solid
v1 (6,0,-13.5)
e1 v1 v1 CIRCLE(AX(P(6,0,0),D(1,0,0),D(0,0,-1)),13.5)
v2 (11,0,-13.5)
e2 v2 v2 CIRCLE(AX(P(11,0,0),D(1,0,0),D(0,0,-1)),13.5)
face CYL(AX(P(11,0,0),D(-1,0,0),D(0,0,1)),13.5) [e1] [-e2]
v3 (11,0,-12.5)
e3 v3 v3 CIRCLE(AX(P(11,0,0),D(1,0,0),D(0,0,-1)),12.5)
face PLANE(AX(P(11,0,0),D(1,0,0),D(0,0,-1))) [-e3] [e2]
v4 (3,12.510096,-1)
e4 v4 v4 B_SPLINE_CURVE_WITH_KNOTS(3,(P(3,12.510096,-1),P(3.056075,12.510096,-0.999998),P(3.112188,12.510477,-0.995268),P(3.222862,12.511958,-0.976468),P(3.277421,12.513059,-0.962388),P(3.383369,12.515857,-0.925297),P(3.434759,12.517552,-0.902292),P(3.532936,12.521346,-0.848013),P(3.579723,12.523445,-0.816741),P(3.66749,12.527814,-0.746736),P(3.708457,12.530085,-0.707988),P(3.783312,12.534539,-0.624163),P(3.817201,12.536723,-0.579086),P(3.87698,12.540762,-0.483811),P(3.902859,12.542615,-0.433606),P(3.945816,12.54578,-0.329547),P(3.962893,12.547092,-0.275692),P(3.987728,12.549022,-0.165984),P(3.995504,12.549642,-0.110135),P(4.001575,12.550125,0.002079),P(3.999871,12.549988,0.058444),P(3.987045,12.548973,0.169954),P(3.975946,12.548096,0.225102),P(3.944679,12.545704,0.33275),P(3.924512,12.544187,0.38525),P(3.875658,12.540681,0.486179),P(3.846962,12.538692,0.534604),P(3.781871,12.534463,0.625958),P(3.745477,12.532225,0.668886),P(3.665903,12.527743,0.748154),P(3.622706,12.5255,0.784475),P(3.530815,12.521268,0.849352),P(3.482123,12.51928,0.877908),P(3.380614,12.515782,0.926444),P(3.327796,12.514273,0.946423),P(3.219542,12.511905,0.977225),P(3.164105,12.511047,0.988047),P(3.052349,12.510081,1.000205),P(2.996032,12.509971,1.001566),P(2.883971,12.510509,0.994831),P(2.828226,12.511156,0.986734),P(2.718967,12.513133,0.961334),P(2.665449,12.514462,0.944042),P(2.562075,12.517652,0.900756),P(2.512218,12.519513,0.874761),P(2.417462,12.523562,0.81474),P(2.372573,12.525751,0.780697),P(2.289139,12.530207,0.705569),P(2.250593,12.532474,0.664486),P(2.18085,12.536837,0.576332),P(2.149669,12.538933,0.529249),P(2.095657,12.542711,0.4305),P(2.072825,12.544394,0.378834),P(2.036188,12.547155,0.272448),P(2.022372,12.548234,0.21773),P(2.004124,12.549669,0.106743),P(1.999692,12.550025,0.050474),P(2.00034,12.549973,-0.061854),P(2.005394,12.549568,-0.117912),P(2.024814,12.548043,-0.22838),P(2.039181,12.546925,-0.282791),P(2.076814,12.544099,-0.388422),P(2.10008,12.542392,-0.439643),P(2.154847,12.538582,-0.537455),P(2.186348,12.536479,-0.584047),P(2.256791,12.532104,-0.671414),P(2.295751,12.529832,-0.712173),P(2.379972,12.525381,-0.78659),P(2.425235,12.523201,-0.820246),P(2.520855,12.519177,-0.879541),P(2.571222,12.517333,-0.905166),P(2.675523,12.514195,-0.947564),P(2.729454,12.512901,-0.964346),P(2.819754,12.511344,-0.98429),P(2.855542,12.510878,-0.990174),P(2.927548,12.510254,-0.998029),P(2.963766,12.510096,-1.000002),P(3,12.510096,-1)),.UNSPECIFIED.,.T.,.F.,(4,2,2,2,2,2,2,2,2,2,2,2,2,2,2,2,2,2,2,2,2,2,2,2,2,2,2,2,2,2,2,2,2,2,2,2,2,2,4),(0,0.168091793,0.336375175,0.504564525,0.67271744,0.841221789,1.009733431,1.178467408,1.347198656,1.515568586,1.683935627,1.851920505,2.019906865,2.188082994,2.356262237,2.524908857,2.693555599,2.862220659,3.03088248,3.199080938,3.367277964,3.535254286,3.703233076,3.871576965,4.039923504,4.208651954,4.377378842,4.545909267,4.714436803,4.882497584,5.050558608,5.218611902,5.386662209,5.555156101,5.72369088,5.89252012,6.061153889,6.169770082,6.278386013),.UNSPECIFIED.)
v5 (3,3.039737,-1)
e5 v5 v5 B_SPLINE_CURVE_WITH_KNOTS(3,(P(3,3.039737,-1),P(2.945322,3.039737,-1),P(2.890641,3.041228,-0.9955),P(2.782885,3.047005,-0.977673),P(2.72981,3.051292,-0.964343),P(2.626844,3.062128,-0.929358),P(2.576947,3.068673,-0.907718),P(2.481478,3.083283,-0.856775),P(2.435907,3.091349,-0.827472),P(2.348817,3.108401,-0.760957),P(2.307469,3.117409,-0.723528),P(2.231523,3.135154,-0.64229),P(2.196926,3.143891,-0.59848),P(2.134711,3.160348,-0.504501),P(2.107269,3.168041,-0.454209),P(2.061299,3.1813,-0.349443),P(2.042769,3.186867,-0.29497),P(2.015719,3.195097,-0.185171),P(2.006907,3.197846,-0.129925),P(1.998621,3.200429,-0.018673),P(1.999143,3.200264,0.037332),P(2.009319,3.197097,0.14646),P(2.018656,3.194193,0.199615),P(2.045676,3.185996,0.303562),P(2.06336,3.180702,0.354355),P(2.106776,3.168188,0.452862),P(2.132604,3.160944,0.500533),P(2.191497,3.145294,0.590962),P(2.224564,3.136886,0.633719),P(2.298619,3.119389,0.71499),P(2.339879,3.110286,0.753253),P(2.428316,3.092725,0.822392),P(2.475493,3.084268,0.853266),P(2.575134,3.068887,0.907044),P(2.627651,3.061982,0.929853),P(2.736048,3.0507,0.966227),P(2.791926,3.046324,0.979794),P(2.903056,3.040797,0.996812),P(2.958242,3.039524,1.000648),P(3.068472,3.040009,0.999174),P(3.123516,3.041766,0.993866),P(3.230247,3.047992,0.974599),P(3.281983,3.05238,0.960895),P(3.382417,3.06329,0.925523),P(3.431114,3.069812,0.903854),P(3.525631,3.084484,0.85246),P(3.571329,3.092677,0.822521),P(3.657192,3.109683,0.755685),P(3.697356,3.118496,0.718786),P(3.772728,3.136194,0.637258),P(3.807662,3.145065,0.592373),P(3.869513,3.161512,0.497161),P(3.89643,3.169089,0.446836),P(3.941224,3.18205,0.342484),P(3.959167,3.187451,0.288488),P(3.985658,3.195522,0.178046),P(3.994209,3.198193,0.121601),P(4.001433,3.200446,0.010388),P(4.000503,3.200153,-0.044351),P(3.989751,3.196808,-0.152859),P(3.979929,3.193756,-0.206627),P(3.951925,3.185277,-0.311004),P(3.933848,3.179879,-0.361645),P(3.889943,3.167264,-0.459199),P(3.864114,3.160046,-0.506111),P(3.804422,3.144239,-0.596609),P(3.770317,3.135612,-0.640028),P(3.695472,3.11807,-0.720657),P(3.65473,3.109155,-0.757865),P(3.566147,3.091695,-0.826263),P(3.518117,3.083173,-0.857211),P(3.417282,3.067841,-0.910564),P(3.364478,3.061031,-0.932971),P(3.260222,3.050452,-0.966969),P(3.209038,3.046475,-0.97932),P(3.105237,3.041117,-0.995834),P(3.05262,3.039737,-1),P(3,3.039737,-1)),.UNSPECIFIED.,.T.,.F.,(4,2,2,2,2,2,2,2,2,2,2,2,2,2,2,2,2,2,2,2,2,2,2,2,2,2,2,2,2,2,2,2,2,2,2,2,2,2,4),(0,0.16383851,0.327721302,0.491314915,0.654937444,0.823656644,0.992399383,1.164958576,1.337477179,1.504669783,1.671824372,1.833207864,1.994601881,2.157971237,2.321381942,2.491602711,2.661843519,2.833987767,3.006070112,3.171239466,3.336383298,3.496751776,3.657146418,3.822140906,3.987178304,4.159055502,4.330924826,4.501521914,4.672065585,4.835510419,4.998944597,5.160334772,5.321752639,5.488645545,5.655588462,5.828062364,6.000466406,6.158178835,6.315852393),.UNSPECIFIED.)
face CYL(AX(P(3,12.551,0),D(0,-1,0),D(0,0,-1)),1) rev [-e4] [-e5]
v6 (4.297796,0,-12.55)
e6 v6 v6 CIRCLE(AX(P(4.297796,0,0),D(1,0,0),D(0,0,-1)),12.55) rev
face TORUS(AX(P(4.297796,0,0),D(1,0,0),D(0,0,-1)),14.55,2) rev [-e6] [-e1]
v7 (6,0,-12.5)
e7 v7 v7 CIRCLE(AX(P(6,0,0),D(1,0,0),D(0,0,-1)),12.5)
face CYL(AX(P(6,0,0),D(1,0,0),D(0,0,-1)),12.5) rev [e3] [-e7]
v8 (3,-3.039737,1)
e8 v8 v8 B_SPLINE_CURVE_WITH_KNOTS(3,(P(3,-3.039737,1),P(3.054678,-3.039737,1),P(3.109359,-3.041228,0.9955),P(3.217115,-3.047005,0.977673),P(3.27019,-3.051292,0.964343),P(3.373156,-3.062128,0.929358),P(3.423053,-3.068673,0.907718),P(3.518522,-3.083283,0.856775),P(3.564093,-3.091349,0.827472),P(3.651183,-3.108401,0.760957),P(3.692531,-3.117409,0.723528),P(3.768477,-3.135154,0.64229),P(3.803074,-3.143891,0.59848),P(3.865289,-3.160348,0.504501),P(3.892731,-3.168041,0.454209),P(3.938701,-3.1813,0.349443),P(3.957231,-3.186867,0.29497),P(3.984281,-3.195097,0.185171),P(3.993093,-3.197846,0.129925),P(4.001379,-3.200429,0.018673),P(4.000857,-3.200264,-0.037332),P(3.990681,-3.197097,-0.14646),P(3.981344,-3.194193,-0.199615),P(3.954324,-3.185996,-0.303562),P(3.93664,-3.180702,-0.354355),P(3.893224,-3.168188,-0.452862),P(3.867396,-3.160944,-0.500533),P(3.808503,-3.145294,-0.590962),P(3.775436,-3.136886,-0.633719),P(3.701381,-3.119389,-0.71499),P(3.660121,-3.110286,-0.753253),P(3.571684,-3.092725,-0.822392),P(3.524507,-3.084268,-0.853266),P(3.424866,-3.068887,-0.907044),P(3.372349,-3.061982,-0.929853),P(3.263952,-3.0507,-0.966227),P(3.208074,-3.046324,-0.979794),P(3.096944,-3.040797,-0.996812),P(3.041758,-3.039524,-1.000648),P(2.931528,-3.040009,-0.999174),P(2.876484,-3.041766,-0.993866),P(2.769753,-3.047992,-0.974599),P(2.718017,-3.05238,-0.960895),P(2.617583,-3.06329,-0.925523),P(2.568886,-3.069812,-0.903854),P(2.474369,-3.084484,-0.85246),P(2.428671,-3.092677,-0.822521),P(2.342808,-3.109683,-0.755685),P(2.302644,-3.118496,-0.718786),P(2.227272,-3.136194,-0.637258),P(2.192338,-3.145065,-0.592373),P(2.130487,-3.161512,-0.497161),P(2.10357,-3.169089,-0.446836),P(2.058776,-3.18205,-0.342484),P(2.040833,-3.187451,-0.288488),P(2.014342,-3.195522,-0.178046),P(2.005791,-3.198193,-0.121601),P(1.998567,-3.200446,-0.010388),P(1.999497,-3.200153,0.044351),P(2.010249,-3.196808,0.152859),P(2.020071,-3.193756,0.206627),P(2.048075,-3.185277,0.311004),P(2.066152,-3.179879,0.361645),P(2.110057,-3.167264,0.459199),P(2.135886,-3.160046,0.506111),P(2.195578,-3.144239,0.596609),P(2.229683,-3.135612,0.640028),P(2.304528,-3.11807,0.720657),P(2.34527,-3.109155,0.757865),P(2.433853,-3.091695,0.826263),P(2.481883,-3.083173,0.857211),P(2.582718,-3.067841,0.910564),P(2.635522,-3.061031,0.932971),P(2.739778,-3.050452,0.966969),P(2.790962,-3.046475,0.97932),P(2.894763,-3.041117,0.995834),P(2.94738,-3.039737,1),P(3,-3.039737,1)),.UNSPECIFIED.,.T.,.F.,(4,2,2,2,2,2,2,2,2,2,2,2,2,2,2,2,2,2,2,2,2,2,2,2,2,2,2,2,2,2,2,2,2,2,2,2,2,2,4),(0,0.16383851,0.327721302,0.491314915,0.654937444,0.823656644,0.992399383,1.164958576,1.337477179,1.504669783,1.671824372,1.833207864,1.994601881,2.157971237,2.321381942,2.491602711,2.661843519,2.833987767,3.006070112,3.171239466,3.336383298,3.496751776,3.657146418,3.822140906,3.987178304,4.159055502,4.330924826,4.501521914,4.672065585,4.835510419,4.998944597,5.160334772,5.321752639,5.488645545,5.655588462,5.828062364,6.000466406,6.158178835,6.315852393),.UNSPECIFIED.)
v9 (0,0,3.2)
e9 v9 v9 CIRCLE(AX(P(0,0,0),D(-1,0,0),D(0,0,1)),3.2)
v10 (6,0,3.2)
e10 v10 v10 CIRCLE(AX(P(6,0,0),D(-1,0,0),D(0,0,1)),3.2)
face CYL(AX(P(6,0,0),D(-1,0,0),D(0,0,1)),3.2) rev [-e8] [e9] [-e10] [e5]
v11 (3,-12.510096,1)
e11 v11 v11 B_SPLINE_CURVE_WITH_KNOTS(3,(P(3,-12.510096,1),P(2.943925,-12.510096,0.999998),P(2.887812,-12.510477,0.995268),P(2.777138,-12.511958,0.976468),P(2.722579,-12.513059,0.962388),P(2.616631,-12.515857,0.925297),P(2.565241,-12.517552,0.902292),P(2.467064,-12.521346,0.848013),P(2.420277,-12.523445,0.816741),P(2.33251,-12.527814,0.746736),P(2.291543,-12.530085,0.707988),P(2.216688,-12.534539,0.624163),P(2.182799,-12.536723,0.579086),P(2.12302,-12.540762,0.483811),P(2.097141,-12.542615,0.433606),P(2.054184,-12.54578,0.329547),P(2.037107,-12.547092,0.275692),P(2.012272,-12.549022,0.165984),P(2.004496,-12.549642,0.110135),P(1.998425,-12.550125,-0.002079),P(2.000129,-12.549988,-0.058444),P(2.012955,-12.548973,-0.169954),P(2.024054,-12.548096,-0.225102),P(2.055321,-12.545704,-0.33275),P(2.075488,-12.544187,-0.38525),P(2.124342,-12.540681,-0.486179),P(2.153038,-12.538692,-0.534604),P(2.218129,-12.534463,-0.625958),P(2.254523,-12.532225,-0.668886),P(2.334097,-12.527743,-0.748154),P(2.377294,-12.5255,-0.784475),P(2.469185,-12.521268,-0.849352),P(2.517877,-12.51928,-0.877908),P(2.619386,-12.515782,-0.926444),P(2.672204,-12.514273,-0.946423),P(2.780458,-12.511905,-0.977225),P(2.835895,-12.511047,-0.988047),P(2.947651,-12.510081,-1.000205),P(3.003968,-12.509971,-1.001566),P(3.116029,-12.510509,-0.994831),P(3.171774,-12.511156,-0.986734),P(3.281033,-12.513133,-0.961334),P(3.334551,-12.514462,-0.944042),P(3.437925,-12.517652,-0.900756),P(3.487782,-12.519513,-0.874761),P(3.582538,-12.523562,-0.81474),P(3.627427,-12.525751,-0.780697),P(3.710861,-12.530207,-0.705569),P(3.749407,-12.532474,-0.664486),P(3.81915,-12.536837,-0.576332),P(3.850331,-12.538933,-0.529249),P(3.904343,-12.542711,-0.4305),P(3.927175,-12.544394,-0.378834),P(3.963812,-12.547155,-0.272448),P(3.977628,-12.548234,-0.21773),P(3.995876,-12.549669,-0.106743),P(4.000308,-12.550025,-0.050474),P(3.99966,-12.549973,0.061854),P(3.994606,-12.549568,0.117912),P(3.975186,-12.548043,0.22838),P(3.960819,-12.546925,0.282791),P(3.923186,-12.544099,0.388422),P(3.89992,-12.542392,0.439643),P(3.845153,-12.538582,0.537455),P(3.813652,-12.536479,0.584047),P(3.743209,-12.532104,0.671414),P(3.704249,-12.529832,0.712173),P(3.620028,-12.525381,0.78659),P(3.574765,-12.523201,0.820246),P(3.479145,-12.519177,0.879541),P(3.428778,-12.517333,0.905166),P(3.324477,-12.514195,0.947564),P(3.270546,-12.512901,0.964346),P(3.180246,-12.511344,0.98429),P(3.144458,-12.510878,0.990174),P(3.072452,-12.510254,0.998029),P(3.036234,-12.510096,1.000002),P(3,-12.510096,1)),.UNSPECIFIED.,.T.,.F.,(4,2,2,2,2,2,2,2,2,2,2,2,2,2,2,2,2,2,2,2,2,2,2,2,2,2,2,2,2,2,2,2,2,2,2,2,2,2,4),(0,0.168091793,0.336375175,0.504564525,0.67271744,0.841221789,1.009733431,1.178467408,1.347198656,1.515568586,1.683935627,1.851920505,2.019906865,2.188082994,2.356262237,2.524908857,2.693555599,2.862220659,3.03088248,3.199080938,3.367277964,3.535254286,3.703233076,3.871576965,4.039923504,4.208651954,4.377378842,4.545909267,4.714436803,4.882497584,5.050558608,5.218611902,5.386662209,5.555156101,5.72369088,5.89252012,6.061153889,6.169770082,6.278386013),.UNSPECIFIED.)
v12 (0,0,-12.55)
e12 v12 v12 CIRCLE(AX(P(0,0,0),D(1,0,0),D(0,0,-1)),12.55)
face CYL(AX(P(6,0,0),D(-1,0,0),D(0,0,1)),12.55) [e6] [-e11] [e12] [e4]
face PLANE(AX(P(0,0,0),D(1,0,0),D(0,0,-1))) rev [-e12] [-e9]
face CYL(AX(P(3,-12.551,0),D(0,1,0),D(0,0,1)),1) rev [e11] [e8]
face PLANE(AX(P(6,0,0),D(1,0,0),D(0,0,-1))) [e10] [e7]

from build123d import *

# Parameters (mm, degrees)
SKETCH_1_R                      = 12.55
EXTRUDE_1_DEPTH                 = 6
SKETCH_2_R                      = 3.2
CUT_EXTRUDE_1_DEPTH             = 6
CUT_EXTRUDE_2_REACH             = 20.735
SKETCH_3_R                      = 1
CUT_EXTRUDE_2_DIRECTION_2_REACH = 20.735
SKETCH_4_R                      = 13.5
EXTRUDE_2_DEPTH                 = 5
SKETCH_5_R                      = 12.5
CUT_EXTRUDE_3_DEPTH             = 5
FILLET_2_R                      = 2


with BuildPart() as part:
    # 草图1 → 凸台-拉伸1 (new body)
    with BuildSketch(Plane(origin=(0, 0, 0), x_dir=(0, 0, -1), z_dir=(1, 0, 0))):
        Circle(SKETCH_1_R)
    extrude(amount=EXTRUDE_1_DEPTH)

    # 草图2 → 切除-拉伸1 (cut)
    with BuildSketch(Plane.ZY):
        Circle(SKETCH_2_R)
    extrude(amount=-CUT_EXTRUDE_1_DEPTH, mode=Mode.SUBTRACT)

    # 草图3 → 切除-拉伸2 (cut, up to next)
    with BuildSketch(Plane(origin=(0, 0, 0), x_dir=(1, 0, 0), z_dir=(0, 1, 0)), mode=Mode.PRIVATE) as cut_extrude_2_sk1:
        with Locations(Location((3, 0, 0), (0, 0, 270))):
            Circle(SKETCH_3_R)
    cut_extrude_2_tool1 = extrude(cut_extrude_2_sk1.sketch, amount=-CUT_EXTRUDE_2_REACH, mode=Mode.PRIVATE) & part.part
    add(cut_extrude_2_tool1.solids().sort_by_distance((3, 0, 0))[0], mode=Mode.SUBTRACT)

    # 草图3 → 切除-拉伸2 direction 2 (cut, up to next)
    with BuildSketch(Plane(origin=(0, 0, 0), x_dir=(1, 0, 0), z_dir=(0, 1, 0)), mode=Mode.PRIVATE) as cut_extrude_2_direction_2_sk1:
        with Locations(Location((3, 0, 0), (0, 0, 270))):
            Circle(SKETCH_3_R)
    cut_extrude_2_direction_2_tool1 = extrude(cut_extrude_2_direction_2_sk1.sketch, amount=CUT_EXTRUDE_2_DIRECTION_2_REACH, mode=Mode.PRIVATE) & part.part
    add(cut_extrude_2_direction_2_tool1.solids().sort_by_distance((3, 0, 0))[0], mode=Mode.SUBTRACT)

    # 草图4 → 凸台-拉伸2 (add)
    with BuildSketch(Plane(origin=(6, 0, 0), x_dir=(0, 0, -1), z_dir=(1, 0, 0))):
        Circle(SKETCH_4_R)
    extrude(amount=EXTRUDE_2_DEPTH)

    # 草图5 → 切除-拉伸3 (cut)
    with BuildSketch(Plane(origin=(11, 0, 0), x_dir=(0, 0, -1), z_dir=(1, 0, 0))):
        Circle(SKETCH_5_R)
    extrude(amount=-CUT_EXTRUDE_3_DEPTH, mode=Mode.SUBTRACT)

    # 圆角2
    # the kernel refuses this fillet: 2 mm, written as the material it adds along each edge
    with BuildSketch(Plane(origin=(6, 0, 0), x_dir=(0, 0, -1), z_dir=(0, -1, 0))) as fillet_2_piece_1:
        with BuildLine():
            CenterArc((14.55, -1.702204453), FILLET_2_R, 121.668243254, 58.331756746)
            Line((12.55, -1.702204453), (12.51, -1.702204453))
            Line((12.51, -1.702204453), (12.51, 0))
            Line((12.51, 0), (12.55, 0.04))
            ThreePointArc((12.55, 0.04), (13.025, 0.04), (13.479, 0.034044089))
            Line((13.479, 0.034044089), (13.5, 0))
        make_face()
    revolve(axis=Axis((6, 0, 0), (1, 0, 0)))


solid = part.part
